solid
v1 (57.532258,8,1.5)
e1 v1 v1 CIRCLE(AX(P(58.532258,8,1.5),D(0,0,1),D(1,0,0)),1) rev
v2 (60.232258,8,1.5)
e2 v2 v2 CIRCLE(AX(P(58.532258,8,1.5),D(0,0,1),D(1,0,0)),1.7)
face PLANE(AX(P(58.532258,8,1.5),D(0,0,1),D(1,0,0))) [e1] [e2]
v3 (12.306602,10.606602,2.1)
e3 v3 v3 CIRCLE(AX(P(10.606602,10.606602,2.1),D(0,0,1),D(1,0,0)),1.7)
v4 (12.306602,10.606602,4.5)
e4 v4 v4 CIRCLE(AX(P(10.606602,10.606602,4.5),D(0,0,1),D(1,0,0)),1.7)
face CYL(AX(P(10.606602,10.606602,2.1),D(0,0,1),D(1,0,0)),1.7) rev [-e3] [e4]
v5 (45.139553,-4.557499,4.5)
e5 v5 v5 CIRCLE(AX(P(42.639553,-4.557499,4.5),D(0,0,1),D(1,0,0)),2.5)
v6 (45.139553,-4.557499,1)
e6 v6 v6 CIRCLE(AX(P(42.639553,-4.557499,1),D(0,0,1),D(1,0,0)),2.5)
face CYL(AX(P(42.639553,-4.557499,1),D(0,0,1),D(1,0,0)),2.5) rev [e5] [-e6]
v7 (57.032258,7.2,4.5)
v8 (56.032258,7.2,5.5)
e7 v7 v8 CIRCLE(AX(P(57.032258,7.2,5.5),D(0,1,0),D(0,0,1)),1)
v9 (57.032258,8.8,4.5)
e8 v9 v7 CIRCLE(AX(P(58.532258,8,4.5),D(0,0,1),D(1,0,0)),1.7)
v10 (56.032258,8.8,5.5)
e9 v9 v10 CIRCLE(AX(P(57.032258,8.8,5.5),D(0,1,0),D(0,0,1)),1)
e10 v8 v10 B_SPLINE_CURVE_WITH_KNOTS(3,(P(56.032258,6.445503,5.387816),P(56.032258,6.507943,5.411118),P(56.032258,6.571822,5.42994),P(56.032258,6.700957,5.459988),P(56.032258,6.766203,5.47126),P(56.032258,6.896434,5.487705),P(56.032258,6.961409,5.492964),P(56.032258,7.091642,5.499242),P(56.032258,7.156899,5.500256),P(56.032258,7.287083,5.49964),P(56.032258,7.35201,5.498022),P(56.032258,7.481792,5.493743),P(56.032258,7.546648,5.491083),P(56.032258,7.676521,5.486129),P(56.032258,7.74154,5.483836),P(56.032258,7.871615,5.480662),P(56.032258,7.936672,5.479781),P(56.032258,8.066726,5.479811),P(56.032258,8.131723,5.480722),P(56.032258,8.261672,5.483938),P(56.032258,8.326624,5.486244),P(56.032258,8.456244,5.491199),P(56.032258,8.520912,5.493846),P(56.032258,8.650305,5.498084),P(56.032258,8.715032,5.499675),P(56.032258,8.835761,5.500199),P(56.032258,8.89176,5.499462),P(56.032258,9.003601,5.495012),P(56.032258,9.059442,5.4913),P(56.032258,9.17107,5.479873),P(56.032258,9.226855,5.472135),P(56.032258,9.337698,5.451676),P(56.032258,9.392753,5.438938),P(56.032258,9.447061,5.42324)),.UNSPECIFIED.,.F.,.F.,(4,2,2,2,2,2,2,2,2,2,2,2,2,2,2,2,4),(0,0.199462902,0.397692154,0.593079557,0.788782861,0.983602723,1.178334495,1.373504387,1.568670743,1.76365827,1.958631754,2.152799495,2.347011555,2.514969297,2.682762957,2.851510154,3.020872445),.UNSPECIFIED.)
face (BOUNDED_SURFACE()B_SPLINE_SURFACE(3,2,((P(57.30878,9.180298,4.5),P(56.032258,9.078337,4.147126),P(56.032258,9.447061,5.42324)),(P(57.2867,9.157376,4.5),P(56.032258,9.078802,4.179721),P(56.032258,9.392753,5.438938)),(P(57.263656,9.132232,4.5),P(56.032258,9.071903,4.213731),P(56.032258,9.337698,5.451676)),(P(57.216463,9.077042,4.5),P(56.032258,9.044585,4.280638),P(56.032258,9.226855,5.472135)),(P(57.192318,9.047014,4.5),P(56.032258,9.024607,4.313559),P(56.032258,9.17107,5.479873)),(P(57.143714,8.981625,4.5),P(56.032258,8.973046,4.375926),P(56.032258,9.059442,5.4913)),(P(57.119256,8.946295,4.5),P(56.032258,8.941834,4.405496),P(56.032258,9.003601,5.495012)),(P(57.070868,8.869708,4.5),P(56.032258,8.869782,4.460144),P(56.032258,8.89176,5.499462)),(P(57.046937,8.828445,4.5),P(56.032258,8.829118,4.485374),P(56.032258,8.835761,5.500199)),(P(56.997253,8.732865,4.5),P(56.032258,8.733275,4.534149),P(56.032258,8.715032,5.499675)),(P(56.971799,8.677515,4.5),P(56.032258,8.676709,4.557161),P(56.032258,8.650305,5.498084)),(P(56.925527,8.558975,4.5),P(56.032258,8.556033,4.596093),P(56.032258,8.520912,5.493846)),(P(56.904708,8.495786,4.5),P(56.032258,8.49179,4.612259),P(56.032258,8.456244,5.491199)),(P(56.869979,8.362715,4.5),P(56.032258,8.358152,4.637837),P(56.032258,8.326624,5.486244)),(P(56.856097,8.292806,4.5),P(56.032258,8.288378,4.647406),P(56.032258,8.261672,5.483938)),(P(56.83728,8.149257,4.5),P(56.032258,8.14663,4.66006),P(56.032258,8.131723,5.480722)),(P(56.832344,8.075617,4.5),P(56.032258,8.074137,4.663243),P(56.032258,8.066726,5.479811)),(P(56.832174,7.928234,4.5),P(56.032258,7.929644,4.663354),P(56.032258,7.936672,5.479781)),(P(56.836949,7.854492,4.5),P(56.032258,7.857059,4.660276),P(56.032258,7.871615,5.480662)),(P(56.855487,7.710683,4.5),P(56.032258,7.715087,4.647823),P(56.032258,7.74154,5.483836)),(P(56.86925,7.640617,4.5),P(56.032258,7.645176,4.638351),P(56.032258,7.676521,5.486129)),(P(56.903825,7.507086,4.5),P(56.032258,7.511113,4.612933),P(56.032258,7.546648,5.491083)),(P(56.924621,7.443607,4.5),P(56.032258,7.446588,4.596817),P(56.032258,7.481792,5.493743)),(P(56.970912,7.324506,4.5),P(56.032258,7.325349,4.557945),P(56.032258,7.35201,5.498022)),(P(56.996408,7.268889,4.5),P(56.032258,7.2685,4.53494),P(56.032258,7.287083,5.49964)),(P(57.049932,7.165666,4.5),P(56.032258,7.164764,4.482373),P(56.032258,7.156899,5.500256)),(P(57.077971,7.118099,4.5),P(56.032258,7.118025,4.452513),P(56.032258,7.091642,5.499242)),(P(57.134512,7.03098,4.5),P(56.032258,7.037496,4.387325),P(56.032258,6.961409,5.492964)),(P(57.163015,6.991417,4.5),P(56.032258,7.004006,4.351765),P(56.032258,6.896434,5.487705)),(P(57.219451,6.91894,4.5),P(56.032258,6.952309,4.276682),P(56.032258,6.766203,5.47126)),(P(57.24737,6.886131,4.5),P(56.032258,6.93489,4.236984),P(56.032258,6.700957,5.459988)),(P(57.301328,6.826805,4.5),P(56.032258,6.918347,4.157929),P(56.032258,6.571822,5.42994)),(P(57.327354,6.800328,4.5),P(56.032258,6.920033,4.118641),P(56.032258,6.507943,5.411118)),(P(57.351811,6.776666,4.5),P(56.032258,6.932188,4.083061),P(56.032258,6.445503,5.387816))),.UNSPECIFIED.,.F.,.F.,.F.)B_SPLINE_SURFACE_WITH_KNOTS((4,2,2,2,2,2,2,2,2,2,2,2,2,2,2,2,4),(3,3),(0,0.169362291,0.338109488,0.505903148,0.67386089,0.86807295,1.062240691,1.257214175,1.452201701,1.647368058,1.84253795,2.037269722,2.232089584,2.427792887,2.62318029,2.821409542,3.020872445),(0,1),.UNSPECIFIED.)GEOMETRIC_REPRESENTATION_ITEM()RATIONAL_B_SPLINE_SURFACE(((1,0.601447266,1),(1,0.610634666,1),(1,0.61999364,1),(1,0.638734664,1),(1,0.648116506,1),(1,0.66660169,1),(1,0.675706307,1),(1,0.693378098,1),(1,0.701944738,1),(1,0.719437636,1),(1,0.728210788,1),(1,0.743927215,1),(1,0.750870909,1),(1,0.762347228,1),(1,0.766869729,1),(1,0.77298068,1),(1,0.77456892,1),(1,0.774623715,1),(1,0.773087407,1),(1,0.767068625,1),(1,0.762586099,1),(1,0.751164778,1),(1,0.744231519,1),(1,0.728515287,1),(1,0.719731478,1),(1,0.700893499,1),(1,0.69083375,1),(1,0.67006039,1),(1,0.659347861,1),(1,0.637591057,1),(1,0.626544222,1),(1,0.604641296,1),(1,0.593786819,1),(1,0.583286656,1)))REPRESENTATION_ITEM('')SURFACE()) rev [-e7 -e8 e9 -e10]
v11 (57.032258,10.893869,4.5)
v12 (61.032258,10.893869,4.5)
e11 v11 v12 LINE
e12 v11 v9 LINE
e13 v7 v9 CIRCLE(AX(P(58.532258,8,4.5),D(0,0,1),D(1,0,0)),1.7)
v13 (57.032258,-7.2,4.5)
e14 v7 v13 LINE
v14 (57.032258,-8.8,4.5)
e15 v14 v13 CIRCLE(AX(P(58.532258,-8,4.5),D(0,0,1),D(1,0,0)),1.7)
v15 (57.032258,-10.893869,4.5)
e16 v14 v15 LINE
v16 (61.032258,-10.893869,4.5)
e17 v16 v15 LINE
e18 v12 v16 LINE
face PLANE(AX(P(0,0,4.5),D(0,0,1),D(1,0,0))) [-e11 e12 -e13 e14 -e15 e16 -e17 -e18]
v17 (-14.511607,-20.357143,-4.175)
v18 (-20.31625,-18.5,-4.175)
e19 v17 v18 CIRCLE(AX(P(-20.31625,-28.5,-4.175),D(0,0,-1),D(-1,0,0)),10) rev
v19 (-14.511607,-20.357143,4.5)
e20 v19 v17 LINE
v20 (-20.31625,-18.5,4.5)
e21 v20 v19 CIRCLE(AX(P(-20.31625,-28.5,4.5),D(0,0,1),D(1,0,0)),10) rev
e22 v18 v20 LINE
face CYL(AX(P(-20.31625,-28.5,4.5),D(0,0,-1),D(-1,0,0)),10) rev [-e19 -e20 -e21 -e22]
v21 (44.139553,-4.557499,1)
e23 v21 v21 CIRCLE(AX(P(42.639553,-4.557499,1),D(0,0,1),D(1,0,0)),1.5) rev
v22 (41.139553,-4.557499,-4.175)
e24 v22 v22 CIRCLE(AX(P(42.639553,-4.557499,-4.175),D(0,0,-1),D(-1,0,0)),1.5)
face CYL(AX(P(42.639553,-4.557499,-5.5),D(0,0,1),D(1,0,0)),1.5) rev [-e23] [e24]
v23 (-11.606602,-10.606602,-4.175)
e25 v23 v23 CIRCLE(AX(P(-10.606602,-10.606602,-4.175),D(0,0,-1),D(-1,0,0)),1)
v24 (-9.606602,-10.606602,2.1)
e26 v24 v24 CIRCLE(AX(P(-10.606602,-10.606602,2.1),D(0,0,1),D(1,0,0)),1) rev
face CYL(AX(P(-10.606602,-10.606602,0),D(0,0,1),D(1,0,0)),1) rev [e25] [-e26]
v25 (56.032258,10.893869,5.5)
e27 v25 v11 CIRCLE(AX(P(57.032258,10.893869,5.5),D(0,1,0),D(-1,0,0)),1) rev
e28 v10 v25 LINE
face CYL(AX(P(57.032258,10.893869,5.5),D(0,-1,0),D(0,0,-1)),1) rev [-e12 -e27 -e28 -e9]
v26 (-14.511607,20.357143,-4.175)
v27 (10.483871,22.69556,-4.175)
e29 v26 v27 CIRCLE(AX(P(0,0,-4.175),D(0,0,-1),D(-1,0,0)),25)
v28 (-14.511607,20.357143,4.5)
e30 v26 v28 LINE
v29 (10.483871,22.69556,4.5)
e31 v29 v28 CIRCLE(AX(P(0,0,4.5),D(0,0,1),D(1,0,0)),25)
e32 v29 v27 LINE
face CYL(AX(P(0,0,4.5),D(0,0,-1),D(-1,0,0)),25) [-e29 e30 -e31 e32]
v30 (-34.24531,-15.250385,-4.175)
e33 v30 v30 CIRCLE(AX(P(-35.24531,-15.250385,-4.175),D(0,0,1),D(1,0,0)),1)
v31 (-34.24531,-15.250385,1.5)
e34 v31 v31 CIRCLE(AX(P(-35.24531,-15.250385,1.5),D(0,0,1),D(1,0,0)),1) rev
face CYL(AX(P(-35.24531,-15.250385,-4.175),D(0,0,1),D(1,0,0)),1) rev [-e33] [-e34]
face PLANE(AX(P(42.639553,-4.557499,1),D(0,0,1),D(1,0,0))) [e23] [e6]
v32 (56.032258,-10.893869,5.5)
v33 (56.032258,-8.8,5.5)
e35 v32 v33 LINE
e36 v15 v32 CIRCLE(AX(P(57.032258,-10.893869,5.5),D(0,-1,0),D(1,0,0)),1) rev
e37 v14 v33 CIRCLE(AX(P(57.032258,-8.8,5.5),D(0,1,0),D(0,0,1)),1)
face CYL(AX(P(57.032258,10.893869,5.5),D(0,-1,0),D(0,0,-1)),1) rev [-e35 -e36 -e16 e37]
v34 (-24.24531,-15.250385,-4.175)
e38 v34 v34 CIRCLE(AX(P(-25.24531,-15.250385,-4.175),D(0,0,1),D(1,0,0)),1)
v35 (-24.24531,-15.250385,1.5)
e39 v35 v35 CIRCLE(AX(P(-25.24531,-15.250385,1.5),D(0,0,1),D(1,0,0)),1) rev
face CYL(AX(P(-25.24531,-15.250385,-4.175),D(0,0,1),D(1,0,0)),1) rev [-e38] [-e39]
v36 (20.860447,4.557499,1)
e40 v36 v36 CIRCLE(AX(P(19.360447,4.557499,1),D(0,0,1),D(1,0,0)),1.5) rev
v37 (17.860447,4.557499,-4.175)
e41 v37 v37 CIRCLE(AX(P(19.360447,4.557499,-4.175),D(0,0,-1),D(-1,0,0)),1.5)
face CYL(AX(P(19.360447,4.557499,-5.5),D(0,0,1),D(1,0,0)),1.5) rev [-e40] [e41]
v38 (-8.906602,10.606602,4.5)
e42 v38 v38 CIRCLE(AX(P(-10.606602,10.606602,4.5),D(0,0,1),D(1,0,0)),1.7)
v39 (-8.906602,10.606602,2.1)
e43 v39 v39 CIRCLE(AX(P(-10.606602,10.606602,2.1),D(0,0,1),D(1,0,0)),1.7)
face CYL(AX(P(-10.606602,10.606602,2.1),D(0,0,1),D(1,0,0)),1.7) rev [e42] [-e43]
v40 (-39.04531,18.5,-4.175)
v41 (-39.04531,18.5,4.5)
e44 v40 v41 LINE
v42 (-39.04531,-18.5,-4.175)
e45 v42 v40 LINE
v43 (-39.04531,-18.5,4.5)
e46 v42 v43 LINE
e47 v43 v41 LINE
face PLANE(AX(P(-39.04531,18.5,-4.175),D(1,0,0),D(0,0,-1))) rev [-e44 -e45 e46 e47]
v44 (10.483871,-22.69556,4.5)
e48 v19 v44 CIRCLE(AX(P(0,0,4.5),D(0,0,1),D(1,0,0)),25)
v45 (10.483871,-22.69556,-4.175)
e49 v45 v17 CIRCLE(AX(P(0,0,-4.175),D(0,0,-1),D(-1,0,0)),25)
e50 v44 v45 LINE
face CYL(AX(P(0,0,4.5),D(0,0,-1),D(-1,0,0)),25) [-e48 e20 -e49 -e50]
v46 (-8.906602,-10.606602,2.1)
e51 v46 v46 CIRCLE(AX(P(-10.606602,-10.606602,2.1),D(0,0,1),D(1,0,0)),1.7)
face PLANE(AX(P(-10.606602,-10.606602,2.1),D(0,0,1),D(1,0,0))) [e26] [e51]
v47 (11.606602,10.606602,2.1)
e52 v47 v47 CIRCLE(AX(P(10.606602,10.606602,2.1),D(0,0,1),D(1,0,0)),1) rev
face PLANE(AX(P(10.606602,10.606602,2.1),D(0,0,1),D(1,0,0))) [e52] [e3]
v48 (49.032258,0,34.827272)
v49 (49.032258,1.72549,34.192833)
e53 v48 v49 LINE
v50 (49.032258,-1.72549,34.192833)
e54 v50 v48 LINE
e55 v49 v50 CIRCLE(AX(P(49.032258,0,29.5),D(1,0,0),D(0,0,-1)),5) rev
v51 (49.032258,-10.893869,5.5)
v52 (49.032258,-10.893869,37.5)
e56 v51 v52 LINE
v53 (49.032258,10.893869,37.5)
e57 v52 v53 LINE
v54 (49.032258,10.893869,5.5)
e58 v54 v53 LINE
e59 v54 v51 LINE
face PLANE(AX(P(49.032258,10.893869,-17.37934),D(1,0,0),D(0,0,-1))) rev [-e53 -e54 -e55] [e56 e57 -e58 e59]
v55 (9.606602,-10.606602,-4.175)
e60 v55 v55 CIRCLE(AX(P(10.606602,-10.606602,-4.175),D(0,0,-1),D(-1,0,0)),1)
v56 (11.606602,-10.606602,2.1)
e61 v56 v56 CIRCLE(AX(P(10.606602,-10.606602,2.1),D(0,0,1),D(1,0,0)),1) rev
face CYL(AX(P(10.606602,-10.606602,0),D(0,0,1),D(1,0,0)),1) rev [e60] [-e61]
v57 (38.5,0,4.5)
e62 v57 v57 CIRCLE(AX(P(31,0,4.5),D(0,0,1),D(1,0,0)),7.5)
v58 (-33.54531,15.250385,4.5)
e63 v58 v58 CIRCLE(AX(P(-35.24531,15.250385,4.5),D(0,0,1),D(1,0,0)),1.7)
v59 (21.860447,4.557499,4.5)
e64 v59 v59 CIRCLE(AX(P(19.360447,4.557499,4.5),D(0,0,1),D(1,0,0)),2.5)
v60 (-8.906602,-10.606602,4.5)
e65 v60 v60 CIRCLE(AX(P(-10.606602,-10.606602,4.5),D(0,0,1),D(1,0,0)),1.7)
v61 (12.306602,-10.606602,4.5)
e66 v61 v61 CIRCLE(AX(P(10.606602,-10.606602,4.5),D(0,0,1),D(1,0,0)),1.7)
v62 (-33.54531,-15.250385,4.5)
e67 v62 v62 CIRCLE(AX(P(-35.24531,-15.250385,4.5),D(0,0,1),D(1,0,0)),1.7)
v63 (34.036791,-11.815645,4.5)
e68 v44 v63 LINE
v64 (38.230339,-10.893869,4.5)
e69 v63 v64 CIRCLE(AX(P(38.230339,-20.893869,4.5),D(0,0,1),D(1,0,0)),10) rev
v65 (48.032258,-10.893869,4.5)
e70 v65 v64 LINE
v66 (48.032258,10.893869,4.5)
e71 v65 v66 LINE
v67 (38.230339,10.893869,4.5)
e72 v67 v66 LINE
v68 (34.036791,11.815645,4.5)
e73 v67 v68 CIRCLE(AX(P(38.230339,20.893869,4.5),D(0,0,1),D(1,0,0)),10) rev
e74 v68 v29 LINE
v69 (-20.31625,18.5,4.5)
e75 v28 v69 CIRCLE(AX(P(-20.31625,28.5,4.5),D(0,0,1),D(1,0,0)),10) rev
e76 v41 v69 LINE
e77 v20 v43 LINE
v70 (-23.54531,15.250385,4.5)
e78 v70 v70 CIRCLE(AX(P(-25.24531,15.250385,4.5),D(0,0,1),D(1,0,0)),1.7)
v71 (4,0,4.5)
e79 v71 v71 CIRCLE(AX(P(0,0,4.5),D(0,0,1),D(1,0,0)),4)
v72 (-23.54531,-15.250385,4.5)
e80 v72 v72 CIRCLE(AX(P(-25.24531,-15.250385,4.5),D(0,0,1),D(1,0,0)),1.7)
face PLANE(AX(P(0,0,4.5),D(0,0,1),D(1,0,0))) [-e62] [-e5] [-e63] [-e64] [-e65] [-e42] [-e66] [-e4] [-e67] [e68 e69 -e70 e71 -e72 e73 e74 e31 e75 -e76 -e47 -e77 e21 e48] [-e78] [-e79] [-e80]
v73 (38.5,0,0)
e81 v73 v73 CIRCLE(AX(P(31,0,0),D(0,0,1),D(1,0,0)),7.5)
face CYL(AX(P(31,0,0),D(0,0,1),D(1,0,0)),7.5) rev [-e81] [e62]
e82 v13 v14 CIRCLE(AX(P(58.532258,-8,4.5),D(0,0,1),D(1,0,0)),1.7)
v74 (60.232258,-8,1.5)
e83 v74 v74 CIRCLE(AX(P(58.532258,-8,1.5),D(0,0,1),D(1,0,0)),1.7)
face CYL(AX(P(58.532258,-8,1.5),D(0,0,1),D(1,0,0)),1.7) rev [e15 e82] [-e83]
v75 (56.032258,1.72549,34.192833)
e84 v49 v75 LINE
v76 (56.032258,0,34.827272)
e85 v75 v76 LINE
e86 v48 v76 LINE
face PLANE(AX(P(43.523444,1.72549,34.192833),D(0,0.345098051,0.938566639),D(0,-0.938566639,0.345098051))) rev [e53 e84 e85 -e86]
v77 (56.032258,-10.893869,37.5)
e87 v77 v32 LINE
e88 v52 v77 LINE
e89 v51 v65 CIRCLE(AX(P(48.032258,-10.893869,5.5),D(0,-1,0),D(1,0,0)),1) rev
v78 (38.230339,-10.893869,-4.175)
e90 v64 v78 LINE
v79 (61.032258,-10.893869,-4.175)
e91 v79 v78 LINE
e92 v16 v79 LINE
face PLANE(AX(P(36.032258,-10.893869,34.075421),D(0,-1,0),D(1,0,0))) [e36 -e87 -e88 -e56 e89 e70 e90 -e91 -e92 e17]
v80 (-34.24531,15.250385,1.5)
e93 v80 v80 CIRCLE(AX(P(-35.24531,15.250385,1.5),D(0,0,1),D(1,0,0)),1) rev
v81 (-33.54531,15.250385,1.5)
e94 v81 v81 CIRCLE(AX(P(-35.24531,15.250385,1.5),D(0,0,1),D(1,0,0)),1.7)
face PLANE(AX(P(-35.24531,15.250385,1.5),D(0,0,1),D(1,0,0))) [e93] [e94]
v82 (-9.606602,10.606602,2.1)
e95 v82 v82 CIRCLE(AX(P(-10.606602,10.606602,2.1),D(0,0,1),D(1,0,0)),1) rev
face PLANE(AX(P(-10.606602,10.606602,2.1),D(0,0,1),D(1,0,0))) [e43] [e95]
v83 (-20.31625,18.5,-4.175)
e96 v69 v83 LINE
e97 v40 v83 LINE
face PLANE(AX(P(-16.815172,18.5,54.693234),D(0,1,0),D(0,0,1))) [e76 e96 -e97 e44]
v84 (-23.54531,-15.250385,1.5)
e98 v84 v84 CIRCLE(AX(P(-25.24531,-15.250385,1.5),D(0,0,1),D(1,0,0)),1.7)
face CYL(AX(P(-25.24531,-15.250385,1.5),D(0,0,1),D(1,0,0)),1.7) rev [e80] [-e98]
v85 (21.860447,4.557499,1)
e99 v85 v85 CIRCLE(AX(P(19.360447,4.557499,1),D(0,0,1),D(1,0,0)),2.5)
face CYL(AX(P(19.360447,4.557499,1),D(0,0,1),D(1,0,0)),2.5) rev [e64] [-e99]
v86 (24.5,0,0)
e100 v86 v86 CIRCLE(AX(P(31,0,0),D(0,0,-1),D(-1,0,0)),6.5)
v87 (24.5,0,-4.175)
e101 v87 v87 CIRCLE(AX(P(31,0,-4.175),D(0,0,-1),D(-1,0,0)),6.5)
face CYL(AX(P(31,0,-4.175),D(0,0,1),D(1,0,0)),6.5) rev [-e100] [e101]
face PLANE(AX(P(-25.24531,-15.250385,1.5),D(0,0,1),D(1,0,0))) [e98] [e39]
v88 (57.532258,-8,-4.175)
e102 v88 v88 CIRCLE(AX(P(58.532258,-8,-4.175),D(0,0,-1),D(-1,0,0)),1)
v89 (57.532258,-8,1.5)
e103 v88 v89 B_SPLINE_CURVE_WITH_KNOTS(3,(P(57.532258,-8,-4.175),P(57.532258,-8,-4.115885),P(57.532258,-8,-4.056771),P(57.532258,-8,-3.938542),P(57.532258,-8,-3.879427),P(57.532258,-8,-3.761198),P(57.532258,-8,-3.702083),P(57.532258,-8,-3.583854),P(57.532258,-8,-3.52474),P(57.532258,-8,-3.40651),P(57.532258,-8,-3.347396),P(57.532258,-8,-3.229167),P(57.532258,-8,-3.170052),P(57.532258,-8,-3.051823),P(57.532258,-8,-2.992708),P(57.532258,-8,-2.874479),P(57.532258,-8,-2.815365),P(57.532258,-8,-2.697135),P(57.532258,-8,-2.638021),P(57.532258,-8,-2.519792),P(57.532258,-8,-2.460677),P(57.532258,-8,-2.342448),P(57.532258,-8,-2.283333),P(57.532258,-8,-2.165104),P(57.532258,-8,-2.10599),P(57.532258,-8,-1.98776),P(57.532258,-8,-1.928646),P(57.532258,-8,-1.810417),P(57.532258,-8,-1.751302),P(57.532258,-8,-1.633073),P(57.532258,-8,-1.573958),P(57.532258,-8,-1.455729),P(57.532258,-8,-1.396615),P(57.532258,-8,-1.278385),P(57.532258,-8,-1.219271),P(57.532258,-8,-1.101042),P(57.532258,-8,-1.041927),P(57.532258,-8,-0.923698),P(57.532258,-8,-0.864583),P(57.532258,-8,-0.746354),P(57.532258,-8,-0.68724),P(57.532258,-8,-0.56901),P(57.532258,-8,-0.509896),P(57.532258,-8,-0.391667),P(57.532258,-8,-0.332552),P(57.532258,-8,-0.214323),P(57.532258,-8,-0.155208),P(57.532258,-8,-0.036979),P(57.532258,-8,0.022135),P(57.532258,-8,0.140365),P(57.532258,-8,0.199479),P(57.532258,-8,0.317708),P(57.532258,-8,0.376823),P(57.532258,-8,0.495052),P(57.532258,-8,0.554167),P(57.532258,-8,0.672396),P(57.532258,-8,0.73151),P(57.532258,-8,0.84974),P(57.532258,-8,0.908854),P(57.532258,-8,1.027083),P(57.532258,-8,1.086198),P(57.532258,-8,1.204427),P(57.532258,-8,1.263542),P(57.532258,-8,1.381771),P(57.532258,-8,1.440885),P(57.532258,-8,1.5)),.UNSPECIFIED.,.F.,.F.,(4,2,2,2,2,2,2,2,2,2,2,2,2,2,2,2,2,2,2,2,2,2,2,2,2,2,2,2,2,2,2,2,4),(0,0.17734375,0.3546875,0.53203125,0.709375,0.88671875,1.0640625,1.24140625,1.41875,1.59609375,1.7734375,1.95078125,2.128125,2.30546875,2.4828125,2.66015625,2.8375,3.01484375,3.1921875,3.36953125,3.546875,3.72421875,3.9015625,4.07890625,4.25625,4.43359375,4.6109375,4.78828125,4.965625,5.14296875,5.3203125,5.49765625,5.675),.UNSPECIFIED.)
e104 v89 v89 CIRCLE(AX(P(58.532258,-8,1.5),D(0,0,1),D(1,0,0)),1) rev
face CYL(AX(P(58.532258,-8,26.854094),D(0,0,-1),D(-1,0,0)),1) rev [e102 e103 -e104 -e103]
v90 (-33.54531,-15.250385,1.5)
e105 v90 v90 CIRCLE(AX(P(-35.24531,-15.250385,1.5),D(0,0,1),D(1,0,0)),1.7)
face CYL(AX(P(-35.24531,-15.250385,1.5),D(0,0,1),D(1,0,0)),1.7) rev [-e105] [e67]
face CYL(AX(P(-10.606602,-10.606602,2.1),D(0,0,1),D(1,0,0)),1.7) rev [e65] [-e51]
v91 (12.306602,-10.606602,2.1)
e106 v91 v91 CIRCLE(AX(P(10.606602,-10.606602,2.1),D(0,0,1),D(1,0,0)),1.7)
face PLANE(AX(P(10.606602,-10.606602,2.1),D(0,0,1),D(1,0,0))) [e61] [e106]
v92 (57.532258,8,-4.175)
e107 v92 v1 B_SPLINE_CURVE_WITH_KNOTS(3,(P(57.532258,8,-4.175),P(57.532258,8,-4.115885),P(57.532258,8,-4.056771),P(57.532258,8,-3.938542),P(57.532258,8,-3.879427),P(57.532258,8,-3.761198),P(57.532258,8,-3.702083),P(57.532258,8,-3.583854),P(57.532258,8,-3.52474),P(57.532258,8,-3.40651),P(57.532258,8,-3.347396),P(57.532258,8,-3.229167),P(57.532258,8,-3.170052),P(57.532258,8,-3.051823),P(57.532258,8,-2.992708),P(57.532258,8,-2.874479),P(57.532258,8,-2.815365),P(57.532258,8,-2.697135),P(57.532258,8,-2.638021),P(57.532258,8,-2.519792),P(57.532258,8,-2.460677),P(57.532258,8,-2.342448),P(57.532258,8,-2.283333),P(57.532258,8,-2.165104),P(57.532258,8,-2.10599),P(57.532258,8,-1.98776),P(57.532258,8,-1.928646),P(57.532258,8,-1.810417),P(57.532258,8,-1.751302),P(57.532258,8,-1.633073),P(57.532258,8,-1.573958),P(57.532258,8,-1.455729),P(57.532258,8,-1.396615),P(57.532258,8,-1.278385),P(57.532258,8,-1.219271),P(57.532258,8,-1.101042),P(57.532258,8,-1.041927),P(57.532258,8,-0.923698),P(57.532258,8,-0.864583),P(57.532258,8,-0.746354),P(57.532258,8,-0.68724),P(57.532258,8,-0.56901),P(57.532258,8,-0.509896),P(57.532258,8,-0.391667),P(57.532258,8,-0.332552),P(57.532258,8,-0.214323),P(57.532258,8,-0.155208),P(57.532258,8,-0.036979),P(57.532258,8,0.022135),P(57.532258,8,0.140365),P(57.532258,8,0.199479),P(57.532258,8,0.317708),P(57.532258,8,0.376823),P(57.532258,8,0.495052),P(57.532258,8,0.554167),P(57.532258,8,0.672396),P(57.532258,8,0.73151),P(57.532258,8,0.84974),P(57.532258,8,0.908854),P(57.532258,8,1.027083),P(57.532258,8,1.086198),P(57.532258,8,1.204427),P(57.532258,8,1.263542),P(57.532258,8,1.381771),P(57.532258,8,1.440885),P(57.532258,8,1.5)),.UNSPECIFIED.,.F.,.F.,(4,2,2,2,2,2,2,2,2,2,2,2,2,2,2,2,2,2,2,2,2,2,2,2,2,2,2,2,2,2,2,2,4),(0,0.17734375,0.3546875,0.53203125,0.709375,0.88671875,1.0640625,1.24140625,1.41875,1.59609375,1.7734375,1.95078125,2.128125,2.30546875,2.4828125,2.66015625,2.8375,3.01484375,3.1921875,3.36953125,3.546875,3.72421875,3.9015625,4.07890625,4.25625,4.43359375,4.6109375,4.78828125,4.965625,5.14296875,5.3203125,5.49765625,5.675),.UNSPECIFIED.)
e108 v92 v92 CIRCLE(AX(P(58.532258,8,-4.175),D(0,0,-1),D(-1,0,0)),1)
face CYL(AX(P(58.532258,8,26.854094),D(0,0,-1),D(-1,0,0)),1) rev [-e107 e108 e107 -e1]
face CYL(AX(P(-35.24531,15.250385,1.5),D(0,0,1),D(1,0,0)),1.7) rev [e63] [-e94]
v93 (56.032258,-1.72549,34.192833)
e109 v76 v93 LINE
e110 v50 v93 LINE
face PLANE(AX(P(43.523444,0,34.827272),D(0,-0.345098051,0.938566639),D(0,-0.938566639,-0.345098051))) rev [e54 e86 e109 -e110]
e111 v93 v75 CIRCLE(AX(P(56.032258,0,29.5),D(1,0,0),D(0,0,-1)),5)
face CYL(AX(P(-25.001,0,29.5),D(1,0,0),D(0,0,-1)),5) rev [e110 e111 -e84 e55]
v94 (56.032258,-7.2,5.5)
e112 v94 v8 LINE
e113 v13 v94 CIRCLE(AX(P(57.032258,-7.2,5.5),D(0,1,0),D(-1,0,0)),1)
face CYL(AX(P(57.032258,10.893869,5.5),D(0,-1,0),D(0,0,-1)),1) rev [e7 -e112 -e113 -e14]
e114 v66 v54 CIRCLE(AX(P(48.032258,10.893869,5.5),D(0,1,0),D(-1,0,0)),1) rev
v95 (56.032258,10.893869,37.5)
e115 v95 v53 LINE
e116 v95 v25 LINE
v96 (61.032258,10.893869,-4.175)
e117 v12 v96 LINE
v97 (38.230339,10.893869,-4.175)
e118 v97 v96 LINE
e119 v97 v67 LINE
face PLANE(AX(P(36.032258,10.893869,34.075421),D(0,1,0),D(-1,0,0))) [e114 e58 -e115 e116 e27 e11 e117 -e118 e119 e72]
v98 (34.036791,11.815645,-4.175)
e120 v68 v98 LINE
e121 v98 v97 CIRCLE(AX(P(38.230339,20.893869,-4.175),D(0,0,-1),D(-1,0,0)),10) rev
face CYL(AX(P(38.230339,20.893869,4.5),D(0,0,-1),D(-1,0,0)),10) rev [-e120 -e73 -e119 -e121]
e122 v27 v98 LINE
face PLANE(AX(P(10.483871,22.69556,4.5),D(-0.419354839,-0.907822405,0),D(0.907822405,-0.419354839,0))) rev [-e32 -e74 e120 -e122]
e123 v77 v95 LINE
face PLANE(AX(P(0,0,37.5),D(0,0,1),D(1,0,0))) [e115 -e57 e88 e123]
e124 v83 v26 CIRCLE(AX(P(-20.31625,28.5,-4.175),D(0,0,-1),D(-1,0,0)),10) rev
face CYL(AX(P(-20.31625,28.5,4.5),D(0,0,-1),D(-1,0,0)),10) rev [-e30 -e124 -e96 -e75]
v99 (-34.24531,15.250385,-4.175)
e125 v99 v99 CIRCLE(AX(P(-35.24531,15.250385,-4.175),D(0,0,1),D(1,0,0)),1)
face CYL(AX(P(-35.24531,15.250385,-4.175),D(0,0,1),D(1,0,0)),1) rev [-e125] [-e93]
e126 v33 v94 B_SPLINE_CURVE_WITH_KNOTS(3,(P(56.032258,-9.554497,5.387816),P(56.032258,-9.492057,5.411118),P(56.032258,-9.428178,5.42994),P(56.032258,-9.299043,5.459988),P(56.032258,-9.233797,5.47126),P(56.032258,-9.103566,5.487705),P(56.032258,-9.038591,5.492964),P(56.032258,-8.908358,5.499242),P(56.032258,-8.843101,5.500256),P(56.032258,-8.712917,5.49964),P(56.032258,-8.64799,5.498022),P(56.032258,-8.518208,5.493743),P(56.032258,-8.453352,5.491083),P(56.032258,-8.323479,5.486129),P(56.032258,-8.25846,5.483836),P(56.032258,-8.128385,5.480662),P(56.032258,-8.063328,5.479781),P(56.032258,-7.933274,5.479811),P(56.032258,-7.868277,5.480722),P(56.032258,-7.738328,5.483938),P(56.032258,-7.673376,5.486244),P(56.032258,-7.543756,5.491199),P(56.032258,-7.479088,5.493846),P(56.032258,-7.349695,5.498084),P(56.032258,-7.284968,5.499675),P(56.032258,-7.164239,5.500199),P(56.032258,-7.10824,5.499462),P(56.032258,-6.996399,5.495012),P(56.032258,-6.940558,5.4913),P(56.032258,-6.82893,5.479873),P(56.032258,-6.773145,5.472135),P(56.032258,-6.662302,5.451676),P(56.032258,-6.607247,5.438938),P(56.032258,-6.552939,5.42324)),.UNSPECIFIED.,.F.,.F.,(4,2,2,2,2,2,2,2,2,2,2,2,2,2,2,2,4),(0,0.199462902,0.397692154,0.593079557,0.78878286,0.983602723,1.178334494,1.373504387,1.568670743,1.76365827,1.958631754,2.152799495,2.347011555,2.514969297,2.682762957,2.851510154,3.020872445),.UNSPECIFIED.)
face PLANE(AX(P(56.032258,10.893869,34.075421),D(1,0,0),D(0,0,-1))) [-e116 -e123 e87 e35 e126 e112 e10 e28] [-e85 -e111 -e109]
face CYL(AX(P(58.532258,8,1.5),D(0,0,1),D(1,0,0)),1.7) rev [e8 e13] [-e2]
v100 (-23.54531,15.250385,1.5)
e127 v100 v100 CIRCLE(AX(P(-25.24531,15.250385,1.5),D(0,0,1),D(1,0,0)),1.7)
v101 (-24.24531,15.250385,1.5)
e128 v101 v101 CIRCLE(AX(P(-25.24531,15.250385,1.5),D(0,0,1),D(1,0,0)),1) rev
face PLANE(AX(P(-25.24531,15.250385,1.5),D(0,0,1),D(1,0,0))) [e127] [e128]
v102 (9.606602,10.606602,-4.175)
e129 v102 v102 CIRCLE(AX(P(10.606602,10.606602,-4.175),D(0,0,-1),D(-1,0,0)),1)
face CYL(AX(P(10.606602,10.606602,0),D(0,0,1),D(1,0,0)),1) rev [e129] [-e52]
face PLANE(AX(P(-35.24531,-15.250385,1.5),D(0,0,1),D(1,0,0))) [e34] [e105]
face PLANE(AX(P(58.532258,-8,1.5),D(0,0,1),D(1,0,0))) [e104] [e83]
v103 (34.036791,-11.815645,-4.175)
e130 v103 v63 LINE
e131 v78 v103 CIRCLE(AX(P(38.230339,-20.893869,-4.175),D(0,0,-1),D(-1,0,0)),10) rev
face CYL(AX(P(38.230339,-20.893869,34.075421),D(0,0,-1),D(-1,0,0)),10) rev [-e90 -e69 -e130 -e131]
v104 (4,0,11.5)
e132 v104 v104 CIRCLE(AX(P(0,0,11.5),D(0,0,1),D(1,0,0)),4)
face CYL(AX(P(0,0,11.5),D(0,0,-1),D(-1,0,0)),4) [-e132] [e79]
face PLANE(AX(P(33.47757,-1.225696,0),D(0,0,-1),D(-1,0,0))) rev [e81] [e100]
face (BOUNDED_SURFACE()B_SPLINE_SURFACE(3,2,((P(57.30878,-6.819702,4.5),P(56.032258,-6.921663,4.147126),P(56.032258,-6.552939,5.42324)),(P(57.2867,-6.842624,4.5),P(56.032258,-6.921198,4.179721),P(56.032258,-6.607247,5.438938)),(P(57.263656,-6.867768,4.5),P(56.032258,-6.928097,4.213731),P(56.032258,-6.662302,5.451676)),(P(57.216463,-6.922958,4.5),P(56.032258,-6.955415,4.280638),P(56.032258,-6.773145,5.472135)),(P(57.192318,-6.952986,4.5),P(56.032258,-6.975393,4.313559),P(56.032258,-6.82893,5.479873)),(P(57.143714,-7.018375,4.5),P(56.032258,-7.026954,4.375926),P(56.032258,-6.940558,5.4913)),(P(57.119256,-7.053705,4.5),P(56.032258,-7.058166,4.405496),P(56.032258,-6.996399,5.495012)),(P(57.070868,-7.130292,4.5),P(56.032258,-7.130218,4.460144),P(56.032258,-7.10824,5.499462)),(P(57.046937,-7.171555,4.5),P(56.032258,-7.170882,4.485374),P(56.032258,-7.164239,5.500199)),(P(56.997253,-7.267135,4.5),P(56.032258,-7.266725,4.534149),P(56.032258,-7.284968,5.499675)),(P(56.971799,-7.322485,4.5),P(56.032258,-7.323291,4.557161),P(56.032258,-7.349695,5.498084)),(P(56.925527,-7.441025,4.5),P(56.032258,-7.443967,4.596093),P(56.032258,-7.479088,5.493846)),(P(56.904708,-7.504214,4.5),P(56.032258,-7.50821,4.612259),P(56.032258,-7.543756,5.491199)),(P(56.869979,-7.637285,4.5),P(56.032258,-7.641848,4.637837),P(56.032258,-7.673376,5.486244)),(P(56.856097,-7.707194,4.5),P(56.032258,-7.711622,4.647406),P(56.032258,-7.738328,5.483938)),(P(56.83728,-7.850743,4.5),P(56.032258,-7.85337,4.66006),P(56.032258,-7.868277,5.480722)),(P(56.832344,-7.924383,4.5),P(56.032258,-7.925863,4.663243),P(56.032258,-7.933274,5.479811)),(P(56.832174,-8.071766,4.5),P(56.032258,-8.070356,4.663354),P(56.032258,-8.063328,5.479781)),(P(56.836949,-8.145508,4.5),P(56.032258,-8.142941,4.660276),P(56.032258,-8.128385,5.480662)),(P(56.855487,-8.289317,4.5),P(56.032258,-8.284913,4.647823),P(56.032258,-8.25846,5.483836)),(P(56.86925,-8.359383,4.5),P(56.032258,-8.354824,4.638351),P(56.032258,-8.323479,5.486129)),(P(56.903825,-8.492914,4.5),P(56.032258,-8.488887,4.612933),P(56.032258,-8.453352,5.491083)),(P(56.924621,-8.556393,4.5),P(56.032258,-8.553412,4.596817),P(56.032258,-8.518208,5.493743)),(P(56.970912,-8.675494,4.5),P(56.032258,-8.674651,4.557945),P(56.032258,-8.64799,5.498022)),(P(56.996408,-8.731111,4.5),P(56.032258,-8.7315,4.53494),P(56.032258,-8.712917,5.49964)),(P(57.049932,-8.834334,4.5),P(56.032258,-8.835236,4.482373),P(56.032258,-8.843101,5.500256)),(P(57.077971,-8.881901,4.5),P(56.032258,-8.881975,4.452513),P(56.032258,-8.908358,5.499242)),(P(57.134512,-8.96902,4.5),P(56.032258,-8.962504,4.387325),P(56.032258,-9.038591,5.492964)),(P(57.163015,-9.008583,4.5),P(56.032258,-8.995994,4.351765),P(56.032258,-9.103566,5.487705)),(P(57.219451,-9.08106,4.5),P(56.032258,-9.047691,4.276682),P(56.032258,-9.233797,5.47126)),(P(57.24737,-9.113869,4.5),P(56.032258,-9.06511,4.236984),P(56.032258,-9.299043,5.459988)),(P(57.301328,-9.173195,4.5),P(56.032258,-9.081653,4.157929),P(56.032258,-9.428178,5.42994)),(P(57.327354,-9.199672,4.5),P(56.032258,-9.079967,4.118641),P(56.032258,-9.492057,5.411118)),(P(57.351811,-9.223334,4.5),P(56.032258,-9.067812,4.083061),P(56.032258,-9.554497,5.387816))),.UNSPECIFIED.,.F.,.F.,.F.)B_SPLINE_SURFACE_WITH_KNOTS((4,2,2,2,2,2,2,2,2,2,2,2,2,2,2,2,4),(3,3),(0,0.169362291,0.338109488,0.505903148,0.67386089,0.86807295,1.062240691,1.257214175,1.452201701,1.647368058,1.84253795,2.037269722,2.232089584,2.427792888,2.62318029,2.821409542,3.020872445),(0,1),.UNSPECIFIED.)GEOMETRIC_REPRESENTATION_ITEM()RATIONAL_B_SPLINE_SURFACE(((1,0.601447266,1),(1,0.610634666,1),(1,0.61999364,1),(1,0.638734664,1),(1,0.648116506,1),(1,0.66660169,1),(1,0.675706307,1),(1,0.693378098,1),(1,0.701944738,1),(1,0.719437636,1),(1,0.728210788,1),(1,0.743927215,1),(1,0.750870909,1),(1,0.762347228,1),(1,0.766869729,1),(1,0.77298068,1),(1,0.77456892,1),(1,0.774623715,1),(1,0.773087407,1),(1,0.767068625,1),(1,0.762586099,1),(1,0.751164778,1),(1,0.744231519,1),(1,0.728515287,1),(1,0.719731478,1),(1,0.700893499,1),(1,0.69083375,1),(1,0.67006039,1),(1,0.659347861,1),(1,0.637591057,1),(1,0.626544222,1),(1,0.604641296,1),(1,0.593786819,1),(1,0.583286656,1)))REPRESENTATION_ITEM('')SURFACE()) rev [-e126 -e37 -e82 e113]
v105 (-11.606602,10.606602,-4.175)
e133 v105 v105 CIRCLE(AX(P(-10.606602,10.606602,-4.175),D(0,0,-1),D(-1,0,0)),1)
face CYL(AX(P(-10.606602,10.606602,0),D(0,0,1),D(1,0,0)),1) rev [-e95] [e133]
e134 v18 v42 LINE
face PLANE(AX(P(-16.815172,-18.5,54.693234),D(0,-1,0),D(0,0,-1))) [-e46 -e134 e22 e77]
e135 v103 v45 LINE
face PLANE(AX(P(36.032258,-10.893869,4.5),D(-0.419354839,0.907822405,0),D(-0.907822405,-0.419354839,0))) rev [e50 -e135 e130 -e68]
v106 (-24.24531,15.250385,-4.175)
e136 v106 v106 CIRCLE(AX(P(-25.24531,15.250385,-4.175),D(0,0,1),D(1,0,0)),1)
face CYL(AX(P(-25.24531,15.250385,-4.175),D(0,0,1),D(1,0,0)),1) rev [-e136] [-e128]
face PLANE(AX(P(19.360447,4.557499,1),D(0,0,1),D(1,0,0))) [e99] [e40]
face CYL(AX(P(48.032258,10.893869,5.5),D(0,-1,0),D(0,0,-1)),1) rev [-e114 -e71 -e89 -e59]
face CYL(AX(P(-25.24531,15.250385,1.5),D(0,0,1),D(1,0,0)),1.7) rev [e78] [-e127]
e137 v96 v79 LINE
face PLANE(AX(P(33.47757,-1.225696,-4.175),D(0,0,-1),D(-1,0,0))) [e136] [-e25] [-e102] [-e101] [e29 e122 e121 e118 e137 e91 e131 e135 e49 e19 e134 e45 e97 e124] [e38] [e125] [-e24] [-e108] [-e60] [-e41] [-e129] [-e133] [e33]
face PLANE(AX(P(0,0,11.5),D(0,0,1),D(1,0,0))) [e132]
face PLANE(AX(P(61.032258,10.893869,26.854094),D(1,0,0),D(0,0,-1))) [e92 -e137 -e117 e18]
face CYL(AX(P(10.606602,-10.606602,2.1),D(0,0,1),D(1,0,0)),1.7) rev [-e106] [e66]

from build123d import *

# Parameters (mm, degrees)
BOSS_EXTRUDE1_DEPTH  = 4.5
SKETCH2_R            = 7.5
CUT_EXTRUDE1_DEPTH   = 50.942466899
SKETCH3_R            = 4
BOSS_EXTRUDE2_DEPTH  = 7
BOSS_EXTRUDE3_DEPTH  = 4.5
FILLET1_R            = 10
CUT_EXTRUDE4_DEPTH   = 62.754464971
SKETCH9_R            = 1
CUT_EXTRUDE5_DEPTH   = 62.182594482
SKETCH10_R           = 1.7
CUT_EXTRUDE6_DEPTH   = 2.4
CUT_EXTRUDE7_DEPTH   = 4.5
FILLET2_R            = 10
CUT_EXTRUDE8_DEPTH   = 51.658168147
SKETCH23_R           = 1
SKETCH23_R_2         = 6.5
BOSS_EXTRUDE6_DEPTH  = 4.175
BOSS_EXTRUDE7_START  = -8.675
BOSS_EXTRUDE7_DEPTH  = 8.675
SKETCH26_W           = 9
SKETCH26_H           = 21.787737724
BOSS_EXTRUDE8_DEPTH  = 33
CUT_EXTRUDE9_REACH   = 94.723
SKETCH27_R           = 5
BOSS_EXTRUDE9_DEPTH  = 8.675
BOSS_EXTRUDE10_DEPTH = 105
FILLET4_R            = 10
CUT_EXTRUDE10_DEPTH  = 9
SKETCH31_W           = 12
SKETCH31_H           = 25
CUT_EXTRUDE11_DEPTH  = 122.612556686
BOSS_EXTRUDE11_DEPTH = 10
CUT_EXTRUDE12_REACH  = 141.704
SKETCH33_W           = 10
SKETCH33_H           = 33
CUT_EXTRUDE13_REACH  = 155.593
SKETCH34_W           = 105
SKETCH34_H           = 35
SKETCH37_W           = 2
SKETCH37_H           = 21.787737724
CUT_EXTRUDE16_DEPTH  = 33
SKETCH38_R           = 1.5
CUT_EXTRUDE17_DEPTH  = 10
SKETCH39_R           = 2.5
CUT_EXTRUDE18_DEPTH  = 3.5
SKETCH40_W           = 23.687187028
SKETCH40_H           = 37
CUT_EXTRUDE19_DEPTH  = 133.5
SKETCH41_W           = 12
SKETCH41_H           = 25
BOSS_EXTRUDE12_DEPTH = 8.675
SKETCH42_W           = 11.686830052
SKETCH42_H           = 37
CUT_EXTRUDE20_DEPTH  = 70.667883159
SKETCH43_R           = 1
CUT_EXTRUDE21_DEPTH  = 70.667883159
SKETCH44_R           = 1.7
CUT_EXTRUDE22_DEPTH  = 3
SKETCH45_W           = 5
SKETCH45_H           = 21.787737724
SKETCH45_R           = 1
BOSS_EXTRUDE13_DEPTH = 8.675
SKETCH46_R           = 1.7
CUT_EXTRUDE23_DEPTH  = 3
FILLET5_R            = 1


with BuildPart() as part:
    # Sketch1 → Boss-Extrude1 (new body)
    with BuildSketch(Plane.XY):
        with BuildLine():
            Line((10.483870968, 22.695560128), (36.032258065, 10.893868862))
            ThreePointArc((36.032258065, 10.893868862), (43, 0), (36.032258065, -10.893868862))
            Line((36.032258065, -10.893868862), (10.483870968, -22.695560128))
            ThreePointArc((10.483870968, -22.695560128), (-25, 0), (10.483870968, 22.695560128))
        make_face()
    extrude(amount=BOSS_EXTRUDE1_DEPTH)

    # Sketch2 → Cut-Extrude1 (cut, through all)
    with BuildSketch(Plane.XY.offset(4.5)):
        with Locations((31, 0)):
            Circle(SKETCH2_R)
    extrude(amount=-CUT_EXTRUDE1_DEPTH, mode=Mode.SUBTRACT)

    # Sketch3 → Boss-Extrude2 (add)
    with BuildSketch(Plane.XY.offset(4.5)):
        Circle(SKETCH3_R)
    extrude(amount=BOSS_EXTRUDE2_DEPTH)

    # Sketch4 → Boss-Extrude3 (add)
    with BuildSketch(Plane(origin=(0, 0, 0), x_dir=(-1, 0, 0), z_dir=(0, 0, -1))):
        with BuildLine():
            Line((-36.032258065, 10.893868862), (-56.032258065, 10.893868862))
            Line((-56.032258065, 10.893868862), (-56.032258065, -10.893868862))
            Line((-56.032258065, -10.893868862), (-36.032258065, -10.893868862))
            ThreePointArc((-36.032258065, -10.893868862), (-43, 0), (-36.032258065, 10.893868862))
        make_face()
        with BuildLine():
            Line((22.501635968, 10.893868862), (42.501635968, 10.893868862))
            Line((42.501635968, 10.893868862), (42.501635968, -10.893868862))
            Line((42.501635968, -10.893868862), (22.501635968, -10.893868862))
            ThreePointArc((22.501635968, -10.893868862), (25, 0), (22.501635968, 10.893868862))
        make_face()
    extrude(amount=-BOSS_EXTRUDE3_DEPTH)

    # Fillet1
    fillet1_edges = [part.edges().sort_by_distance(p)[0] for p in [
        (56.032258065, 10.893868862, 2.25),
        (56.032258065, -10.893868862, 2.25),
        (-42.501635968, -10.893868862, 2.25),
        (-42.501635968, 10.893868862, 2.25),
    ]]
    fillet(fillet1_edges, radius=FILLET1_R)

    # Sketch8 → Cut-Extrude4 (cut, through all)
    with BuildSketch(Plane.XY.offset(4.5)):
        with BuildLine():
            Line((56.032258065, 0.893868862), (56.032258065, -0.893868862))
            ThreePointArc((56.032258065, -0.893868862), (55.873267798, -2.669967796), (55.401352579, -4.389590243))
            Line((55.401352579, -4.389590243), (55.401352579, 4.389590243))
            ThreePointArc((55.401352579, 4.389590243), (55.873267798, 2.669967796), (56.032258065, 0.893868862))
        make_face()
        with BuildLine():
            Line((-42.501635968, -0.893868862), (-42.501635968, 0.893868862))
            ThreePointArc((-42.501635968, 0.893868862), (-42.342645701, 2.669967796), (-41.870730482, 4.389590243))
            Line((-41.870730482, 4.389590243), (-41.870730482, -4.389590243))
            ThreePointArc((-41.870730482, -4.389590243), (-42.342645701, -2.669967796), (-42.501635968, -0.893868862))
        make_face()
    extrude(amount=-CUT_EXTRUDE4_DEPTH, mode=Mode.SUBTRACT)

    # Sketch9 → Cut-Extrude5 (cut, through all)
    with BuildSketch(Plane.XY.offset(4.5)):
        with Locations((-10.606601718, 10.606601718)):
            Circle(SKETCH9_R)
        with Locations((10.606601718, 10.606601718)):
            Circle(SKETCH9_R)
        with Locations((10.606601718, -10.606601718)):
            Circle(SKETCH9_R)
        with Locations((-10.606601718, -10.606601718)):
            Circle(SKETCH9_R)
    extrude(amount=-CUT_EXTRUDE5_DEPTH, mode=Mode.SUBTRACT)

    # Sketch10 → Cut-Extrude6 (cut)
    with BuildSketch(Plane.XY.offset(4.5)):
        with Locations((-10.606601718, 10.606601718)):
            Circle(SKETCH10_R)
        with Locations((10.606601718, 10.606601718)):
            Circle(SKETCH10_R)
        with Locations((10.606601718, -10.606601718)):
            Circle(SKETCH10_R)
        with Locations((-10.606601718, -10.606601718)):
            Circle(SKETCH10_R)
    extrude(amount=-CUT_EXTRUDE6_DEPTH, mode=Mode.SUBTRACT)

    # Sketch11 → Cut-Extrude7 (cut)
    with BuildSketch(Plane(origin=(0, 0, 0), x_dir=(-1, 0, 0), z_dir=(0, 0, -1))):
        with BuildLine():
            Line((-40.960235838, 14.646128502), (-73.67178465, 18.9155259))
            Line((-73.67178465, 18.9155259), (-68.640309048, -15.675868866))
            Line((-68.640309048, -15.675868866), (-41.444996676, -13.212200821))
            ThreePointArc((-41.444996676, -13.212200821), (-43.493415761, 0.756825882), (-40.960235838, 14.646128502))
        make_face()
    extrude(amount=-CUT_EXTRUDE7_DEPTH, mode=Mode.SUBTRACT)

    # Fillet2
    # the kernel refuses this fillet: 10 mm, written as the material it takes off along each edge
    with BuildSketch(Plane(origin=(42.113817462, -10.893868862, 28.001897109), x_dir=(0.1443560651040101, 0.9895258088941827, 0), z_dir=(0, 0, -1))) as fillet2_piece_1:
        with BuildLine():
            CenterArc((8.32021185, -9.941449502), FILLET2_R, 83.796810377, 73.10182949)
            Line((-0.877909984, -6.017859982), (-1.061872421, -5.939388192))
            ThreePointArc((-1.061872421, -5.939388192), (-0.636860154, -2.980058778), (-0.197905162, 0.028871213))
            Line((-0.197905162, 0.028871213), (-0.02161094, 0.19882899))
            ThreePointArc((-0.02161094, 0.19882899), (4.700379422, 0.454694668), (9.422369784, 0.19882899))
            Line((9.422369784, 0.19882899), (9.400758844, 0))
        make_face()
    extrude(amount=51.503794219, mode=Mode.SUBTRACT)
    with BuildSketch(Plane(origin=(42.113817462, 10.893868862, 28.001897109), x_dir=(-1, 0, 0), z_dir=(0, 0, -1))) as fillet2_piece_2:
        with BuildLine():
            CenterArc((8.636247816, -9.668172893), FILLET2_R, 104.801368002, 73.10182949)
            Line((-1.357056556, -9.302293499), (-1.556922643, -9.294975911))
            ThreePointArc((-1.556922643, -9.294975911), (-1.128460387, -4.585508816), (-0.193626747, 0.050086753))
            Line((-0.193626747, 0.050086753), (0, 0.2))
            ThreePointArc((0, 0.2), (3.040779699, 0.2), (6.030465629, 0.193363458))
            Line((6.030465629, 0.193363458), (6.081559398, 0))
        make_face()
    extrude(amount=51.503794219, mode=Mode.SUBTRACT)

    # Sketch12 → Cut-Extrude8 (cut, through all)
    with BuildSketch(Plane.XY.offset(4.5)):
        with BuildLine():
            Line((-22.501635968, 10.893868862), (-42.592674389, 14.819498464))
            Line((-42.592674389, 14.819498464), (-48.148078041, -13.612584929))
            Line((-48.148078041, -13.612584929), (-27.427309778, -14.315310761))
            Line((-27.427309778, -14.315310761), (-22.501635968, -10.893868862))
            ThreePointArc((-22.501635968, -10.893868862), (-25, 0), (-22.501635968, 10.893868862))
        make_face()
    extrude(amount=-CUT_EXTRUDE8_DEPTH, mode=Mode.SUBTRACT)

    # Sketch23 → Boss-Extrude6 (add)
    with BuildSketch(Plane(origin=(0, 0, 0), x_dir=(-1, 0, 0), z_dir=(0, 0, -1))):
        with BuildLine():
            Line((-36.032258065, -10.893868862), (-10.483870968, -22.695560128))
            ThreePointArc((-10.483870968, -22.695560128), (25, 0), (-10.483870968, 22.695560128))
            Line((-10.483870968, 22.695560128), (-36.032258065, 10.893868862))
            ThreePointArc((-36.032258065, 10.893868862), (-41.287575846, 7.470998455), (-43.470874018, 1.591575362))
            ThreePointArc((-43.470874018, 1.591575362), (-43.5, 0), (-43.470874018, -1.591575362))
            ThreePointArc((-43.470874018, -1.591575362), (-41.287575846, -7.470998455), (-36.032258065, -10.893868862))
        make_face()
        with Locations(Location((-10.606601718, -10.606601718, 0), (0, 0, 180))):
            Circle(SKETCH23_R, mode=Mode.SUBTRACT)
        with Locations(Location((10.606601718, -10.606601718, 0), (0, 0, 180))):
            Circle(SKETCH23_R, mode=Mode.SUBTRACT)
        with Locations(Location((10.606601718, 10.606601718, 0), (0, 0, 180))):
            Circle(SKETCH23_R, mode=Mode.SUBTRACT)
        with Locations(Location((-10.606601718, 10.606601718, 0), (0, 0, 180))):
            Circle(SKETCH23_R, mode=Mode.SUBTRACT)
        with Locations((-31, 0)):
            Circle(SKETCH23_R_2, mode=Mode.SUBTRACT)
    extrude(amount=BOSS_EXTRUDE6_DEPTH)

    # Sketch25 → Boss-Extrude7 (add)
    with BuildSketch(Plane(origin=(0, 0, -4.175), x_dir=(-1, 0, 0), z_dir=(0, 0, -1)).offset(BOSS_EXTRUDE7_START)):
        with BuildLine():
            Line((-36.032258065, 10.893868862), (-56.032258065, 10.893868862))
            Line((-56.032258065, 10.893868862), (-56.032258065, -10.893868862))
            Line((-56.032258065, -10.893868862), (-36.032258065, -10.893868862))
            ThreePointArc((-36.032258065, -10.893868862), (-41.287575846, -7.470998455), (-43.470874018, -1.591575362))
            ThreePointArc((-43.470874018, -1.591575362), (-43.5, 0), (-43.470874018, 1.591575362))
            ThreePointArc((-43.470874018, 1.591575362), (-41.287575846, 7.470998455), (-36.032258065, 10.893868862))
        make_face()
    extrude(amount=BOSS_EXTRUDE7_DEPTH)

    # Sketch26 → Boss-Extrude8 (add)
    with BuildSketch(Plane.XY.offset(4.5)):
        with Locations((51.532258065, 0)):
            Rectangle(SKETCH26_W, SKETCH26_H)
    extrude(amount=BOSS_EXTRUDE8_DEPTH)

    # Sketch27 → Cut-Extrude9 (cut, up to next)
    with BuildSketch(Plane(origin=(56.032258065, 0, 0), x_dir=(0, 0, -1), z_dir=(1, 0, 0)), mode=Mode.PRIVATE) as cut_extrude9_sk1:
        with Locations((-29.5, 0)):
            Circle(SKETCH27_R)
    cut_extrude9_tool1 = extrude(cut_extrude9_sk1.sketch, amount=-CUT_EXTRUDE9_REACH, mode=Mode.PRIVATE) & part.part
    add(cut_extrude9_tool1.solids().sort_by_distance((56.032258, 0, 29.5))[0], mode=Mode.SUBTRACT)

    # Sketch28 → Boss-Extrude9 (add)
    with BuildSketch(Plane(origin=(0, 0, -4.175), x_dir=(-1, 0, 0), z_dir=(0, 0, -1))):
        with BuildLine():
            Line((16.815171721, 18.5), (50.732139714, 18.5))
            Line((50.732139714, 18.5), (50.732139714, -18.5))
            Line((50.732139714, -18.5), (16.815171721, -18.5))
            ThreePointArc((16.815171721, -18.5), (25, 0), (16.815171721, 18.5))
        make_face()
    extrude(amount=-BOSS_EXTRUDE9_DEPTH)

    # Sketch29 → Boss-Extrude10 (add)
    with BuildSketch(Plane.XY.offset(4.5)):
        Polygon((-50.732139714, 18.5), (-33.773655718, 18.5), (-33.773655718, 16.5), (-48.732139714, 16.5), (-48.732139714, -16.5), (-33.773655718, -16.5), (-33.773655718, -18.5), (-50.732139714, -18.5), align=None)
    extrude(amount=BOSS_EXTRUDE10_DEPTH)

    # Fillet4
    fillet4_edges = [part.edges().sort_by_distance(p)[0] for p in [
        (-16.815171721, 18.5, 0.1625),
        (-16.815171721, -18.5, 0.1625),
        (36.032258065, 10.893868862, 0.1625),
        (36.032258065, -10.893868862, 0.1625),
    ]]
    fillet(fillet4_edges, radius=FILLET4_R)

    # Sketch30 → Cut-Extrude10 (cut)
    with BuildSketch(Plane(origin=(56.032258065, 0, 0), x_dir=(0, 0, -1), z_dir=(1, 0, 0))):
        with BuildLine():
            Line((-34.192833193, 1.725490257), (-34.827272241, 0))
            Line((-34.827272241, 0), (-34.192833193, -1.725490257))
            ThreePointArc((-34.192833193, -1.725490257), (-34.5, 0), (-34.192833193, 1.725490257))
        make_face()
    extrude(amount=-CUT_EXTRUDE10_DEPTH, mode=Mode.SUBTRACT)

    # Sketch31 → Cut-Extrude11 (cut, through all)
    with BuildSketch(Plane.XY.offset(4.5)):
        with Locations((-40.670586902, 0)):
            Rectangle(SKETCH31_W, SKETCH31_H)
    extrude(amount=-CUT_EXTRUDE11_DEPTH, mode=Mode.SUBTRACT)

    # Sketch32 → Boss-Extrude11 (add)
    with BuildSketch(Plane.XY.offset(4.5)):
        Polygon((-33.773655718, 18.5), (-33.773655718, 16.5), (-27.732139714, 16.5), (-27.732139714, -16.5), (-33.773655718, -16.5), (-33.773655718, -18.5), (-27.044952686, -18.5), (-27.044952686, 18.5), align=None)
    extrude(amount=BOSS_EXTRUDE11_DEPTH)

    # Sketch33 → Cut-Extrude12 (cut, up to next)
    with BuildSketch(Plane(origin=(-27.044952686, 0, 0), x_dir=(0, 0, -1), z_dir=(1, 0, 0)), mode=Mode.PRIVATE) as cut_extrude12_sk1:
        with Locations((-9.5, 0)):
            Rectangle(SKETCH33_W, SKETCH33_H)
    cut_extrude12_tool1 = extrude(cut_extrude12_sk1.sketch, amount=-CUT_EXTRUDE12_REACH, mode=Mode.PRIVATE) & part.part
    add(cut_extrude12_tool1.solids().sort_by_distance((-27.044953, 0, 9.5))[0], mode=Mode.SUBTRACT)

    # Cut-Extrude13: up to this face of the body (flat: up to its plane)
    cut_extrude13_end = Plane(part.part.faces().sort_by_distance((-27.044952686, -17.5, 9.5))[0])
    # Sketch34 → Cut-Extrude13 (cut, up to the picked face)
    with BuildSketch(Plane(origin=(-48.732139714, 0, 0), x_dir=(0, 0, -1), z_dir=(1, 0, 0)), mode=Mode.PRIVATE) as cut_extrude13_sk1:
        with Locations((-57, 0)):
            Rectangle(SKETCH34_W, SKETCH34_H)
    cut_extrude13_tool1 = split(extrude(cut_extrude13_sk1.sketch, amount=CUT_EXTRUDE13_REACH, mode=Mode.PRIVATE), bisect_by=cut_extrude13_end, keep=Keep.BOTH, mode=Mode.PRIVATE)
    add(cut_extrude13_tool1.solids().sort_by(Axis((-48.73214, 0, 57), (1, 0, 0)))[0], mode=Mode.SUBTRACT)

    # Sketch37 → Cut-Extrude16 (cut)
    with BuildSketch(Plane.XY.offset(37.5)):
        with Locations((48.032258065, 0)):
            Rectangle(SKETCH37_W, SKETCH37_H)
    extrude(amount=-CUT_EXTRUDE16_DEPTH, mode=Mode.SUBTRACT)

    # Sketch38 → Cut-Extrude17 (cut)
    with BuildSketch(Plane.XY.offset(4.5)):
        with Locations((19.360446706, 4.557499217)):
            Circle(SKETCH38_R)
        with Locations((42.639553294, -4.557499217)):
            Circle(SKETCH38_R)
    extrude(amount=-CUT_EXTRUDE17_DEPTH, mode=Mode.SUBTRACT)

    # Sketch39 → Cut-Extrude18 (cut)
    with BuildSketch(Plane.XY.offset(4.5)):
        with Locations((19.360446706, 4.557499217)):
            Circle(SKETCH39_R)
        with Locations((42.639553294, -4.557499217)):
            Circle(SKETCH39_R)
    extrude(amount=-CUT_EXTRUDE18_DEPTH, mode=Mode.SUBTRACT)

    # Sketch40 → Cut-Extrude19 (cut)
    with BuildSketch(Plane.XY.offset(4.5)):
        with Locations((-38.8885462, 0)):
            Rectangle(SKETCH40_W, SKETCH40_H)
    extrude(amount=CUT_EXTRUDE19_DEPTH, mode=Mode.SUBTRACT)

    # Sketch41 → Boss-Extrude12 (add)
    with BuildSketch(Plane.XY.offset(4.5)):
        with Locations((-40.670586902, 0)):
            Rectangle(SKETCH41_W, SKETCH41_H)
    extrude(amount=-BOSS_EXTRUDE12_DEPTH)

    # Sketch42 → Cut-Extrude20 (cut, through all)
    with BuildSketch(Plane.XY.offset(4.5)):
        with Locations((-44.888724688, 0)):
            Rectangle(SKETCH42_W, SKETCH42_H)
    extrude(amount=-CUT_EXTRUDE20_DEPTH, mode=Mode.SUBTRACT)

    # Sketch43 → Cut-Extrude21 (cut, through all)
    with BuildSketch(Plane.XY.offset(4.5)):
        with Locations((-35.245309662, 15.250384638)):
            Circle(SKETCH43_R)
        with Locations((-35.245309662, -15.250384638)):
            Circle(SKETCH43_R)
        with Locations((-25.245309662, 15.250384638)):
            Circle(SKETCH43_R)
        with Locations((-25.245309662, -15.250384638)):
            Circle(SKETCH43_R)
    extrude(amount=-CUT_EXTRUDE21_DEPTH, mode=Mode.SUBTRACT)

    # Sketch44 → Cut-Extrude22 (cut)
    with BuildSketch(Plane.XY.offset(4.5)):
        with Locations((-35.245309662, 15.250384638)):
            Circle(SKETCH44_R)
        with Locations((-25.245309662, 15.250384638)):
            Circle(SKETCH44_R)
        with Locations((-35.245309662, -15.250384638)):
            Circle(SKETCH44_R)
        with Locations((-25.245309662, -15.250384638)):
            Circle(SKETCH44_R)
    extrude(amount=-CUT_EXTRUDE22_DEPTH, mode=Mode.SUBTRACT)

    # Sketch45 → Boss-Extrude13 (add)
    with BuildSketch(Plane(origin=(0, 0, -4.175), x_dir=(-1, 0, 0), z_dir=(0, 0, -1))):
        with Locations((-58.532258065, 0)):
            Rectangle(SKETCH45_W, SKETCH45_H)
        with Locations((-58.532258065, 8)):
            Circle(SKETCH45_R, mode=Mode.SUBTRACT)
        with Locations((-58.532258065, -8)):
            Circle(SKETCH45_R, mode=Mode.SUBTRACT)
    extrude(amount=-BOSS_EXTRUDE13_DEPTH)

    # Sketch46 → Cut-Extrude23 (cut)
    with BuildSketch(Plane.XY.offset(4.5)):
        with Locations((58.532258065, 8)):
            Circle(SKETCH46_R)
        with Locations((58.532258065, -8)):
            Circle(SKETCH46_R)
    extrude(amount=-CUT_EXTRUDE23_DEPTH, mode=Mode.SUBTRACT)

    # Fillet5
    fillet5_edges = [part.edges().sort_by_distance(p)[0] for p in [
        (49.032258065, 0, 4.5),
        (56.032258065, 0, 4.5),
    ]]
    fillet(fillet5_edges, radius=FILLET5_R)


solid = part.part
